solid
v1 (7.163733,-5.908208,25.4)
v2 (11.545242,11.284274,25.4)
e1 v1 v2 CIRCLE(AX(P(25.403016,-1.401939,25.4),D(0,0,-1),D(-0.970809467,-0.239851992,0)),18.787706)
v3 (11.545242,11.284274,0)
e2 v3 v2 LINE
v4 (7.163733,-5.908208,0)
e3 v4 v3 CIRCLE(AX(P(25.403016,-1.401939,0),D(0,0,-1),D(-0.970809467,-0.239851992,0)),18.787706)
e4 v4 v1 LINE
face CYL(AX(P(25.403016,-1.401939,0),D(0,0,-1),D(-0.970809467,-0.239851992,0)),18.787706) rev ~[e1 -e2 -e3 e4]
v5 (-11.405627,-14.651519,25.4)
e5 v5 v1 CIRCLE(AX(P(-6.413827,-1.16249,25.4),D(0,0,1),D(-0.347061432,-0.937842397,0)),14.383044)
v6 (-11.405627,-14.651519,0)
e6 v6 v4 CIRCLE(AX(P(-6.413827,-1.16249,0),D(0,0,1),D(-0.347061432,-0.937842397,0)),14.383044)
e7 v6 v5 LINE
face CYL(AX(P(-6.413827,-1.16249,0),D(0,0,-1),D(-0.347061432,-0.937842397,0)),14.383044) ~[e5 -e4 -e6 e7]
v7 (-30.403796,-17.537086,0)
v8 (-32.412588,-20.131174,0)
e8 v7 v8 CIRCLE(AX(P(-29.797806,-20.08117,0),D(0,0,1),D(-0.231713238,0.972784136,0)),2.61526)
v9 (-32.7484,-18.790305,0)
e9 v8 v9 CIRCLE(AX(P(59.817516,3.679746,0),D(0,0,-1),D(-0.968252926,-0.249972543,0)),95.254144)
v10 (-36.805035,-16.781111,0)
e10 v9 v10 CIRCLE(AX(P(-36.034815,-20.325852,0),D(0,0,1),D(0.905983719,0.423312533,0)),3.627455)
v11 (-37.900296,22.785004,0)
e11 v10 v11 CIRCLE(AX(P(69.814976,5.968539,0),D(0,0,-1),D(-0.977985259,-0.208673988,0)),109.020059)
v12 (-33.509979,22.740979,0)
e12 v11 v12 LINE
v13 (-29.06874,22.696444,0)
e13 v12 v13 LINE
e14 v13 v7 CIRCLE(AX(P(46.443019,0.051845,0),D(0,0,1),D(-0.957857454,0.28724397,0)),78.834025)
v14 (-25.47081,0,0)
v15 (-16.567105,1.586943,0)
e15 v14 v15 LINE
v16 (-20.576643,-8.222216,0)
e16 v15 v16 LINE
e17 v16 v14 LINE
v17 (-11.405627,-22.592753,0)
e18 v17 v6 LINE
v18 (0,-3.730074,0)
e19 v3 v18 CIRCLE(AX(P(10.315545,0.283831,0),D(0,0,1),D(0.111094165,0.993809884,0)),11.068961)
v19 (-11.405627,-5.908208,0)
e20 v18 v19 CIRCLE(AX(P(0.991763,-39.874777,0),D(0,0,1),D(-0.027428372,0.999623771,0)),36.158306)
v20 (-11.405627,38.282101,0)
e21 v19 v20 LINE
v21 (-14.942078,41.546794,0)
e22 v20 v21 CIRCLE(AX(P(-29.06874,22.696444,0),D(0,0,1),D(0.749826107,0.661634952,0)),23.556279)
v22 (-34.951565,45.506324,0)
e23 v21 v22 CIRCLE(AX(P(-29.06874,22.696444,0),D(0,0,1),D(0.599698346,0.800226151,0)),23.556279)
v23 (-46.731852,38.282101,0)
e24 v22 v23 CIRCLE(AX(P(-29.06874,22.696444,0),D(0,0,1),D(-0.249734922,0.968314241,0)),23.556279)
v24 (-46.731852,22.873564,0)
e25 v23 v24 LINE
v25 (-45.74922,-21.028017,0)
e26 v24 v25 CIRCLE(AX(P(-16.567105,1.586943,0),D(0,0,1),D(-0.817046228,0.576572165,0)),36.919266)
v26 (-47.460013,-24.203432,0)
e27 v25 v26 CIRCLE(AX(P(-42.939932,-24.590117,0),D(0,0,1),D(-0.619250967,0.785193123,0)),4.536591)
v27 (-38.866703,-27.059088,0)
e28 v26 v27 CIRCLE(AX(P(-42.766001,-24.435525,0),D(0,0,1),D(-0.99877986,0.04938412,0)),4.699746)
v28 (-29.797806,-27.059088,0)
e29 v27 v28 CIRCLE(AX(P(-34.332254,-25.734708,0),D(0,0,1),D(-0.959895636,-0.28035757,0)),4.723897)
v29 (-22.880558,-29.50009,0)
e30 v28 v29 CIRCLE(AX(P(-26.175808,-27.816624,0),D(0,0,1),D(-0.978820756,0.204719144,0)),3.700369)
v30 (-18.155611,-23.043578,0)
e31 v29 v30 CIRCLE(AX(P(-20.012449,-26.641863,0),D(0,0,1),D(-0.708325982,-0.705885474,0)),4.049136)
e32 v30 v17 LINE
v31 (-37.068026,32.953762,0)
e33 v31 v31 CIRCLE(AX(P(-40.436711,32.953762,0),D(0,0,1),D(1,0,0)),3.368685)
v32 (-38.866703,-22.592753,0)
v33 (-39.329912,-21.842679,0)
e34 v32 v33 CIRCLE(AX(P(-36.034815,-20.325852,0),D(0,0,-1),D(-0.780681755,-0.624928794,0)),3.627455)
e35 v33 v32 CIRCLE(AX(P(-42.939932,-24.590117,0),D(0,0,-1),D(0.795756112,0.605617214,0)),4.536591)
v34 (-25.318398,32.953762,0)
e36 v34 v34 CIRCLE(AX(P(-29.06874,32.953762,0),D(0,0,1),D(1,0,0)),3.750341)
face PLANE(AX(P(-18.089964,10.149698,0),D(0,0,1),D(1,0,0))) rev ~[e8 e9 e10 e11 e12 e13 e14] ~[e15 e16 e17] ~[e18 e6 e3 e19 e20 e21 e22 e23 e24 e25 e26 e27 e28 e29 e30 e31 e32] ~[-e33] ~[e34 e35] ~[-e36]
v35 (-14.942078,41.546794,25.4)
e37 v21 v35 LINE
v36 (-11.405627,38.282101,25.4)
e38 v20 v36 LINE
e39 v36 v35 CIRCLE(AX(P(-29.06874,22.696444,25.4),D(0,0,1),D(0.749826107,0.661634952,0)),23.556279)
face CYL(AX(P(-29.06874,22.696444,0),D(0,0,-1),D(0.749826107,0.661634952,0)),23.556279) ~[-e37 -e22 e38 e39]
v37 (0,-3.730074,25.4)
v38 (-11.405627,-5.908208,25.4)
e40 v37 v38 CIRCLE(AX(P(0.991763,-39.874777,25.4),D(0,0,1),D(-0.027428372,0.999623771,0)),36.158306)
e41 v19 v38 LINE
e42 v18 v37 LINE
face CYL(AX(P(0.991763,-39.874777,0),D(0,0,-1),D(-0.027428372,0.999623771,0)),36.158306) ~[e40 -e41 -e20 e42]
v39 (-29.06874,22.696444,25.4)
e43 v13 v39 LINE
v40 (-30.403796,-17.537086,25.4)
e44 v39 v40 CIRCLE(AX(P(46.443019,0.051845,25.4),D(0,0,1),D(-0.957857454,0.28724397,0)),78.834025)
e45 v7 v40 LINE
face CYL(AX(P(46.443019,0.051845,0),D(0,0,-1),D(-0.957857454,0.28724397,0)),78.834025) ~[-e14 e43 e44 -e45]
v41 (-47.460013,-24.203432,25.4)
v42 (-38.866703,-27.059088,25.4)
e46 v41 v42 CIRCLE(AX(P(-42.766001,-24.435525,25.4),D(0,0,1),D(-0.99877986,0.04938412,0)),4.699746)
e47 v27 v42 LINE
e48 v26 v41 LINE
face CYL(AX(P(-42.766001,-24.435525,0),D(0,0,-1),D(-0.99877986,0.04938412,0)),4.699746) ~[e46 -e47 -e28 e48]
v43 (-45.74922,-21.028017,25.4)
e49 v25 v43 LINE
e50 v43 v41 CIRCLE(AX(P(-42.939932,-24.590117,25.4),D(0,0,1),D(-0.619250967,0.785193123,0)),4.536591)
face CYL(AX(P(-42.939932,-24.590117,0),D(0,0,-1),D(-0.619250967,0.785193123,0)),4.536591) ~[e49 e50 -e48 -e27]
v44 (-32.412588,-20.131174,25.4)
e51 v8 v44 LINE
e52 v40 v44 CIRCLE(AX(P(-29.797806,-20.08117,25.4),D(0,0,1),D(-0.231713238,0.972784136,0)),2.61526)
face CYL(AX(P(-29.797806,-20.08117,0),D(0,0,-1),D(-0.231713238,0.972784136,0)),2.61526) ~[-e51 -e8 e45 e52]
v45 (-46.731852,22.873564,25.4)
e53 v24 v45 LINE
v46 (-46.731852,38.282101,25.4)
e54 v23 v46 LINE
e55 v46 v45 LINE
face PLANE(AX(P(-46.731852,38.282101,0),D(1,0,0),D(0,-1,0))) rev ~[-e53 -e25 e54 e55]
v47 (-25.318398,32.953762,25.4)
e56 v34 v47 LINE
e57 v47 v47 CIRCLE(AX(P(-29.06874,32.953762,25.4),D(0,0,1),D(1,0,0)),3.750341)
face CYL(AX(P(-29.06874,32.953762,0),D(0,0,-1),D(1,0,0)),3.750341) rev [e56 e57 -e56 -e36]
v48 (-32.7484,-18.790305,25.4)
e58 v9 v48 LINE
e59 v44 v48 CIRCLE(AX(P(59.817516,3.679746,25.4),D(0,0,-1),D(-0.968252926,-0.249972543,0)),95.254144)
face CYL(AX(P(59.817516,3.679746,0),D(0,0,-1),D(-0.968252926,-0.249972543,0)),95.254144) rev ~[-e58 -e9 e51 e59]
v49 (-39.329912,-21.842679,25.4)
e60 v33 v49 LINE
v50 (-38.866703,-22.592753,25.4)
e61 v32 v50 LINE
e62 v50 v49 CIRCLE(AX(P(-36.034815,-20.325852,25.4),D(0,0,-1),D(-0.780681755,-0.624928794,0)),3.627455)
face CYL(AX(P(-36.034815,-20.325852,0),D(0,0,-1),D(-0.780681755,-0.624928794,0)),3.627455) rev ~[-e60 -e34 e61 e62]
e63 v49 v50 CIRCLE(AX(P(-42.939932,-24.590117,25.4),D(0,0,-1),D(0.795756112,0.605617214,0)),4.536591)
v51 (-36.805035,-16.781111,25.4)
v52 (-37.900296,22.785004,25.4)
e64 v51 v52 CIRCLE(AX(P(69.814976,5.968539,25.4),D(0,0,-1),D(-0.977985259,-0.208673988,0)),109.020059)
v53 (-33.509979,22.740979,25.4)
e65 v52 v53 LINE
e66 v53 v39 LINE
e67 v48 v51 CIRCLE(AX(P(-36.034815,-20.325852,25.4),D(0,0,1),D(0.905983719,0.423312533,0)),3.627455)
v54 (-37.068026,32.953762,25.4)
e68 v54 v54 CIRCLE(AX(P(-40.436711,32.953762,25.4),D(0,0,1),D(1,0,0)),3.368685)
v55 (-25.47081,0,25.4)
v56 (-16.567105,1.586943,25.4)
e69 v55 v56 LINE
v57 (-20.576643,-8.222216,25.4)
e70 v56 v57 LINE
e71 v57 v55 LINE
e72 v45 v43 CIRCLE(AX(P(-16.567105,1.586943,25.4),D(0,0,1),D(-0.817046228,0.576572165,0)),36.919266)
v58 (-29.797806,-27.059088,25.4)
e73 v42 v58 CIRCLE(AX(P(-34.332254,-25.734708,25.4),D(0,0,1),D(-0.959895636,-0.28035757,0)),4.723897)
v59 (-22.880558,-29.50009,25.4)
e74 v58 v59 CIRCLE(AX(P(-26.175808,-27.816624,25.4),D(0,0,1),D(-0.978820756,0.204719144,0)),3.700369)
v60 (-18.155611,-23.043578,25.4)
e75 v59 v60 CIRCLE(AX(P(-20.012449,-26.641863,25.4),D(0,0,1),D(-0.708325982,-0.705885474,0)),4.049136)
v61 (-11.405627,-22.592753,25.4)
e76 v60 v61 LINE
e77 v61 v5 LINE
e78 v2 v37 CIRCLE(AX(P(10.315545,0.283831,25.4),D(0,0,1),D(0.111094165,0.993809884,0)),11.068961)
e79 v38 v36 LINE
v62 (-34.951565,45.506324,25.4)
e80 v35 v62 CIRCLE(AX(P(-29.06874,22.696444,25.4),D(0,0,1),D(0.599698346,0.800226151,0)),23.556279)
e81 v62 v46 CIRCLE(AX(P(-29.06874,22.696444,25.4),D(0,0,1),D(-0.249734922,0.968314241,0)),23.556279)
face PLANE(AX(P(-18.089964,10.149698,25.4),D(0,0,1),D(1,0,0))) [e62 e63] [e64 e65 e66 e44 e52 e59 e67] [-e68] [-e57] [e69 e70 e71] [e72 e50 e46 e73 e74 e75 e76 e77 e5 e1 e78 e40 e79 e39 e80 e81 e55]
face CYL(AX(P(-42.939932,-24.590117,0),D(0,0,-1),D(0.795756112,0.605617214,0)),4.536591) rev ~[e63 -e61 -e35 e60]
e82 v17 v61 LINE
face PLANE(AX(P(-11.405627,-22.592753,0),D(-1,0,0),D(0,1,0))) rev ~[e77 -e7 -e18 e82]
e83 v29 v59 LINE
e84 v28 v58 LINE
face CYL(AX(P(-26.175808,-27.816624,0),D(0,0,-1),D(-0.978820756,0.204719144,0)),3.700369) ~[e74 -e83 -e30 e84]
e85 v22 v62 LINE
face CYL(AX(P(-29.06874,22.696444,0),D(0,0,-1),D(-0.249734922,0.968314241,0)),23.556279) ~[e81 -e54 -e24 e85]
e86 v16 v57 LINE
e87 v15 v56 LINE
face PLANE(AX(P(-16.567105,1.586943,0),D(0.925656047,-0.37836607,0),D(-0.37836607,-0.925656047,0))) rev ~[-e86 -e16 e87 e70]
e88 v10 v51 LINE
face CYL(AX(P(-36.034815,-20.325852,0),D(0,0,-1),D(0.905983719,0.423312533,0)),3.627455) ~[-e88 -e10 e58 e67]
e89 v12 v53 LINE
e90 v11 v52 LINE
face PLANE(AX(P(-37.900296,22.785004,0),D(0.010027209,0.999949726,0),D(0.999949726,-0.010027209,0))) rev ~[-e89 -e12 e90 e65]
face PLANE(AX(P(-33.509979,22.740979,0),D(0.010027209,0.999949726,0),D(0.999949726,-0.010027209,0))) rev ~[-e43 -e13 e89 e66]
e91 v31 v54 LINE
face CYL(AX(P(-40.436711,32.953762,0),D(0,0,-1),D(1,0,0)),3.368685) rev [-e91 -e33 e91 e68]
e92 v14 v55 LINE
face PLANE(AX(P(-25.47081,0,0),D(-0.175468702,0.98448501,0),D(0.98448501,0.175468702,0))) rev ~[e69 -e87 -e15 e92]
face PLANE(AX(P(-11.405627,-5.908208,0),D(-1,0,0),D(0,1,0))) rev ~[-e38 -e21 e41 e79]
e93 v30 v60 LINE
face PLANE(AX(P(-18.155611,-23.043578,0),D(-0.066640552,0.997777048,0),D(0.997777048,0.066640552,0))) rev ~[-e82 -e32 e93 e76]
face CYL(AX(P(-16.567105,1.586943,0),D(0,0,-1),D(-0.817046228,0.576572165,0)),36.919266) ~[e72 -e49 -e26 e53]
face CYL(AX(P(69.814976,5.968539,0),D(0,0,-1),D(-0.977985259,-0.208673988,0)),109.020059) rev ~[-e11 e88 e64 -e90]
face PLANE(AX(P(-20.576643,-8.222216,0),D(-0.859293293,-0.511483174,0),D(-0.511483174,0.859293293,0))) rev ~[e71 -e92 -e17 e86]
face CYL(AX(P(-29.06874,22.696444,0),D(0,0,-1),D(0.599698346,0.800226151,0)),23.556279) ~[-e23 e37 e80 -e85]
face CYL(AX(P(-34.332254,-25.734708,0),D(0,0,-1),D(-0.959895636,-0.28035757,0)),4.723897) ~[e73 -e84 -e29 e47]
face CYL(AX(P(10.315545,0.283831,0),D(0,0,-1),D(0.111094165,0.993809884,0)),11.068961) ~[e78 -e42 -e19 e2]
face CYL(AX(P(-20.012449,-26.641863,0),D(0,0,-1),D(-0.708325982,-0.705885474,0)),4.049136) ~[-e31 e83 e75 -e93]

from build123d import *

# Parameters (mm, degrees)
F0_R     = 3.3686848121
F0_R_2   = 3.7503411647
F1_DEPTH = 25.4


# Not quite as in the source:
# - the program builds the solid bodies; features that only make, move or delete a surface that nothing else refers to are left out


with BuildPart() as f1:
    # F0 (on Top) → F1 (new body)
    with BuildSketch(Plane.XY):
        with BuildLine():
            Line((-11.4056267505, -5.9082075022), (-11.4056267505, 38.28210113))
            ThreePointArc((-11.4056267505, 38.28210113), (-13.0902542949, 40.0050046024), (-14.9420781413, 41.5467940758))
            ThreePointArc((-14.9420781413, 41.5467940758), (-24.4960295494, 45.8046369765), (-34.9515650706, 45.5063239844))
            ThreePointArc((-34.9515650706, 45.5063239844), (-41.3833712338, 42.777482568), (-46.7318524877, 38.28210113))
            Line((-46.7318524877, 38.28210113), (-46.7318524877, 22.8735643321))
            Line((-46.7318524877, 22.8735643321), (-37.9002960534, 22.7850040211))
            Line((-37.9002960534, 22.7850040211), (-33.5099794506, 22.7409791874))
            Line((-33.5099794506, 22.7409791874), (-29.0687396191, 22.6964437101))
            ThreePointArc((-29.0687396191, 22.6964437101), (-32.3476402886, 2.6663309949), (-30.4037962217, -17.5370864196))
            ThreePointArc((-30.4037962217, -17.5370864196), (-28.3292963567, -17.9171307498), (-27.2098111607, -19.7045132715))
            ThreePointArc((-27.2098111607, -19.7045132715), (-22.8158840867, -19.1811881286), (-19.9977839656, -22.5927531719))
            ThreePointArc((-19.9977839656, -22.5927531719), (-19.0499304153, -22.7087900697), (-18.1556105797, -23.043577982))
            Line((-18.1556105797, -23.043577982), (-11.4056267505, -22.5927531719))
            Line((-11.4056267505, -22.5927531719), (-11.4056267505, -14.6515189691))
            ThreePointArc((-11.4056267505, -14.6515189691), (-0.2868217682, -14.1752443759), (7.1637327783, -5.9082075022))
            ThreePointArc((7.1637327783, -5.9082075022), (7.197230267, 3.2378107083), (11.5452415215, 11.2842738641))
            ThreePointArc((11.5452415215, 11.2842738641), (1.5408183988, 7.0311325334), (0, -3.7300742697))
            ThreePointArc((0, -3.7300742697), (-5.7908190197, -4.3583061138), (-11.4056267505, -5.9082075022))
        make_face()
        Polygon((-25.470810011, 0), (-16.5671050976, 1.5869429488), (-20.5766428262, -8.2222158089), align=None, mode=Mode.SUBTRACT)
        with Locations((-40.4367111623, 32.953761518)):
            Circle(F0_R, mode=Mode.SUBTRACT)
        with Locations((-29.0687396191, 32.953761518)):
            Circle(F0_R_2, mode=Mode.SUBTRACT)
        with BuildLine():
            Line((-37.9002960534, 22.7850040211), (-46.7318524877, 22.8735643321))
            ThreePointArc((-46.7318524877, 22.8735643321), (-53.4771270799, 0.7607999274), (-45.7492200512, -21.028016743))
            ThreePointArc((-45.7492200512, -21.028016743), (-44.0238078591, -20.1849073614), (-42.104174186, -20.131174475))
            ThreePointArc((-42.104174186, -20.131174475), (-40.558011078, -20.7291440142), (-39.3299119733, -21.8426791577))
            ThreePointArc((-39.3299119733, -21.8426791577), (-39.2808229847, -18.7066363859), (-36.8050348739, -16.7811112041))
            ThreePointArc((-36.8050348739, -16.7811112041), (-39.1633371869, 2.951823761), (-37.9002960534, 22.7850040211))
        make_face()
        with BuildLine():
            ThreePointArc((-42.104174186, -20.131174475), (-44.0238078591, -20.1849073614), (-45.7492200512, -21.028016743))
            ThreePointArc((-45.7492200512, -21.028016743), (-46.9337681485, -22.4383900317), (-47.4600126918, -24.2034321528))
            ThreePointArc((-47.4600126918, -24.2034321528), (-44.2480891567, -28.8954606668), (-38.8667027357, -27.059088003))
            ThreePointArc((-38.8667027357, -27.059088003), (-34.3322542596, -30.4586049869), (-29.7978057834, -27.059088003))
            ThreePointArc((-29.7978057834, -27.059088003), (-27.4071947516, -31.3060964302), (-22.8805579245, -29.5000895858))
            ThreePointArc((-22.8805579245, -29.5000895858), (-16.7448352708, -29.0331395554), (-18.1556105797, -23.043577982))
            ThreePointArc((-18.1556105797, -23.043577982), (-19.0499304153, -22.7087900697), (-19.9977839656, -22.5927531719))
            ThreePointArc((-19.9977839656, -22.5927531719), (-22.8158840867, -19.1811881286), (-27.2098111607, -19.7045132715))
            ThreePointArc((-27.2098111607, -19.7045132715), (-28.3292963567, -17.9171307498), (-30.4037962217, -17.5370864196))
            ThreePointArc((-30.4037962217, -17.5370864196), (-31.8655744774, -18.4799458919), (-32.4125880239, -20.131174475))
            ThreePointArc((-32.4125880239, -20.131174475), (-32.5829263413, -19.4613489943), (-32.7484000877, -18.7903052132))
            ThreePointArc((-32.7484000877, -18.7903052132), (-34.4248384474, -17.0752518162), (-36.8050348739, -16.7811112041))
            ThreePointArc((-36.8050348739, -16.7811112041), (-39.2808229847, -18.7066363859), (-39.3299119733, -21.8426791577))
            ThreePointArc((-39.3299119733, -21.8426791577), (-40.558011078, -20.7291440142), (-42.104174186, -20.131174475))
        make_face()
        with BuildLine():
            ThreePointArc((-38.8667027357, -22.5927531719), (-39.1211782585, -22.231840123), (-39.3299119733, -21.8426791577))
            ThreePointArc((-39.3299119733, -21.8426791577), (-39.0800443488, -22.2064378205), (-38.8667027357, -22.5927531719))
        make_face(mode=Mode.SUBTRACT)
    extrude(amount=F1_DEPTH)


solid = f1.part
